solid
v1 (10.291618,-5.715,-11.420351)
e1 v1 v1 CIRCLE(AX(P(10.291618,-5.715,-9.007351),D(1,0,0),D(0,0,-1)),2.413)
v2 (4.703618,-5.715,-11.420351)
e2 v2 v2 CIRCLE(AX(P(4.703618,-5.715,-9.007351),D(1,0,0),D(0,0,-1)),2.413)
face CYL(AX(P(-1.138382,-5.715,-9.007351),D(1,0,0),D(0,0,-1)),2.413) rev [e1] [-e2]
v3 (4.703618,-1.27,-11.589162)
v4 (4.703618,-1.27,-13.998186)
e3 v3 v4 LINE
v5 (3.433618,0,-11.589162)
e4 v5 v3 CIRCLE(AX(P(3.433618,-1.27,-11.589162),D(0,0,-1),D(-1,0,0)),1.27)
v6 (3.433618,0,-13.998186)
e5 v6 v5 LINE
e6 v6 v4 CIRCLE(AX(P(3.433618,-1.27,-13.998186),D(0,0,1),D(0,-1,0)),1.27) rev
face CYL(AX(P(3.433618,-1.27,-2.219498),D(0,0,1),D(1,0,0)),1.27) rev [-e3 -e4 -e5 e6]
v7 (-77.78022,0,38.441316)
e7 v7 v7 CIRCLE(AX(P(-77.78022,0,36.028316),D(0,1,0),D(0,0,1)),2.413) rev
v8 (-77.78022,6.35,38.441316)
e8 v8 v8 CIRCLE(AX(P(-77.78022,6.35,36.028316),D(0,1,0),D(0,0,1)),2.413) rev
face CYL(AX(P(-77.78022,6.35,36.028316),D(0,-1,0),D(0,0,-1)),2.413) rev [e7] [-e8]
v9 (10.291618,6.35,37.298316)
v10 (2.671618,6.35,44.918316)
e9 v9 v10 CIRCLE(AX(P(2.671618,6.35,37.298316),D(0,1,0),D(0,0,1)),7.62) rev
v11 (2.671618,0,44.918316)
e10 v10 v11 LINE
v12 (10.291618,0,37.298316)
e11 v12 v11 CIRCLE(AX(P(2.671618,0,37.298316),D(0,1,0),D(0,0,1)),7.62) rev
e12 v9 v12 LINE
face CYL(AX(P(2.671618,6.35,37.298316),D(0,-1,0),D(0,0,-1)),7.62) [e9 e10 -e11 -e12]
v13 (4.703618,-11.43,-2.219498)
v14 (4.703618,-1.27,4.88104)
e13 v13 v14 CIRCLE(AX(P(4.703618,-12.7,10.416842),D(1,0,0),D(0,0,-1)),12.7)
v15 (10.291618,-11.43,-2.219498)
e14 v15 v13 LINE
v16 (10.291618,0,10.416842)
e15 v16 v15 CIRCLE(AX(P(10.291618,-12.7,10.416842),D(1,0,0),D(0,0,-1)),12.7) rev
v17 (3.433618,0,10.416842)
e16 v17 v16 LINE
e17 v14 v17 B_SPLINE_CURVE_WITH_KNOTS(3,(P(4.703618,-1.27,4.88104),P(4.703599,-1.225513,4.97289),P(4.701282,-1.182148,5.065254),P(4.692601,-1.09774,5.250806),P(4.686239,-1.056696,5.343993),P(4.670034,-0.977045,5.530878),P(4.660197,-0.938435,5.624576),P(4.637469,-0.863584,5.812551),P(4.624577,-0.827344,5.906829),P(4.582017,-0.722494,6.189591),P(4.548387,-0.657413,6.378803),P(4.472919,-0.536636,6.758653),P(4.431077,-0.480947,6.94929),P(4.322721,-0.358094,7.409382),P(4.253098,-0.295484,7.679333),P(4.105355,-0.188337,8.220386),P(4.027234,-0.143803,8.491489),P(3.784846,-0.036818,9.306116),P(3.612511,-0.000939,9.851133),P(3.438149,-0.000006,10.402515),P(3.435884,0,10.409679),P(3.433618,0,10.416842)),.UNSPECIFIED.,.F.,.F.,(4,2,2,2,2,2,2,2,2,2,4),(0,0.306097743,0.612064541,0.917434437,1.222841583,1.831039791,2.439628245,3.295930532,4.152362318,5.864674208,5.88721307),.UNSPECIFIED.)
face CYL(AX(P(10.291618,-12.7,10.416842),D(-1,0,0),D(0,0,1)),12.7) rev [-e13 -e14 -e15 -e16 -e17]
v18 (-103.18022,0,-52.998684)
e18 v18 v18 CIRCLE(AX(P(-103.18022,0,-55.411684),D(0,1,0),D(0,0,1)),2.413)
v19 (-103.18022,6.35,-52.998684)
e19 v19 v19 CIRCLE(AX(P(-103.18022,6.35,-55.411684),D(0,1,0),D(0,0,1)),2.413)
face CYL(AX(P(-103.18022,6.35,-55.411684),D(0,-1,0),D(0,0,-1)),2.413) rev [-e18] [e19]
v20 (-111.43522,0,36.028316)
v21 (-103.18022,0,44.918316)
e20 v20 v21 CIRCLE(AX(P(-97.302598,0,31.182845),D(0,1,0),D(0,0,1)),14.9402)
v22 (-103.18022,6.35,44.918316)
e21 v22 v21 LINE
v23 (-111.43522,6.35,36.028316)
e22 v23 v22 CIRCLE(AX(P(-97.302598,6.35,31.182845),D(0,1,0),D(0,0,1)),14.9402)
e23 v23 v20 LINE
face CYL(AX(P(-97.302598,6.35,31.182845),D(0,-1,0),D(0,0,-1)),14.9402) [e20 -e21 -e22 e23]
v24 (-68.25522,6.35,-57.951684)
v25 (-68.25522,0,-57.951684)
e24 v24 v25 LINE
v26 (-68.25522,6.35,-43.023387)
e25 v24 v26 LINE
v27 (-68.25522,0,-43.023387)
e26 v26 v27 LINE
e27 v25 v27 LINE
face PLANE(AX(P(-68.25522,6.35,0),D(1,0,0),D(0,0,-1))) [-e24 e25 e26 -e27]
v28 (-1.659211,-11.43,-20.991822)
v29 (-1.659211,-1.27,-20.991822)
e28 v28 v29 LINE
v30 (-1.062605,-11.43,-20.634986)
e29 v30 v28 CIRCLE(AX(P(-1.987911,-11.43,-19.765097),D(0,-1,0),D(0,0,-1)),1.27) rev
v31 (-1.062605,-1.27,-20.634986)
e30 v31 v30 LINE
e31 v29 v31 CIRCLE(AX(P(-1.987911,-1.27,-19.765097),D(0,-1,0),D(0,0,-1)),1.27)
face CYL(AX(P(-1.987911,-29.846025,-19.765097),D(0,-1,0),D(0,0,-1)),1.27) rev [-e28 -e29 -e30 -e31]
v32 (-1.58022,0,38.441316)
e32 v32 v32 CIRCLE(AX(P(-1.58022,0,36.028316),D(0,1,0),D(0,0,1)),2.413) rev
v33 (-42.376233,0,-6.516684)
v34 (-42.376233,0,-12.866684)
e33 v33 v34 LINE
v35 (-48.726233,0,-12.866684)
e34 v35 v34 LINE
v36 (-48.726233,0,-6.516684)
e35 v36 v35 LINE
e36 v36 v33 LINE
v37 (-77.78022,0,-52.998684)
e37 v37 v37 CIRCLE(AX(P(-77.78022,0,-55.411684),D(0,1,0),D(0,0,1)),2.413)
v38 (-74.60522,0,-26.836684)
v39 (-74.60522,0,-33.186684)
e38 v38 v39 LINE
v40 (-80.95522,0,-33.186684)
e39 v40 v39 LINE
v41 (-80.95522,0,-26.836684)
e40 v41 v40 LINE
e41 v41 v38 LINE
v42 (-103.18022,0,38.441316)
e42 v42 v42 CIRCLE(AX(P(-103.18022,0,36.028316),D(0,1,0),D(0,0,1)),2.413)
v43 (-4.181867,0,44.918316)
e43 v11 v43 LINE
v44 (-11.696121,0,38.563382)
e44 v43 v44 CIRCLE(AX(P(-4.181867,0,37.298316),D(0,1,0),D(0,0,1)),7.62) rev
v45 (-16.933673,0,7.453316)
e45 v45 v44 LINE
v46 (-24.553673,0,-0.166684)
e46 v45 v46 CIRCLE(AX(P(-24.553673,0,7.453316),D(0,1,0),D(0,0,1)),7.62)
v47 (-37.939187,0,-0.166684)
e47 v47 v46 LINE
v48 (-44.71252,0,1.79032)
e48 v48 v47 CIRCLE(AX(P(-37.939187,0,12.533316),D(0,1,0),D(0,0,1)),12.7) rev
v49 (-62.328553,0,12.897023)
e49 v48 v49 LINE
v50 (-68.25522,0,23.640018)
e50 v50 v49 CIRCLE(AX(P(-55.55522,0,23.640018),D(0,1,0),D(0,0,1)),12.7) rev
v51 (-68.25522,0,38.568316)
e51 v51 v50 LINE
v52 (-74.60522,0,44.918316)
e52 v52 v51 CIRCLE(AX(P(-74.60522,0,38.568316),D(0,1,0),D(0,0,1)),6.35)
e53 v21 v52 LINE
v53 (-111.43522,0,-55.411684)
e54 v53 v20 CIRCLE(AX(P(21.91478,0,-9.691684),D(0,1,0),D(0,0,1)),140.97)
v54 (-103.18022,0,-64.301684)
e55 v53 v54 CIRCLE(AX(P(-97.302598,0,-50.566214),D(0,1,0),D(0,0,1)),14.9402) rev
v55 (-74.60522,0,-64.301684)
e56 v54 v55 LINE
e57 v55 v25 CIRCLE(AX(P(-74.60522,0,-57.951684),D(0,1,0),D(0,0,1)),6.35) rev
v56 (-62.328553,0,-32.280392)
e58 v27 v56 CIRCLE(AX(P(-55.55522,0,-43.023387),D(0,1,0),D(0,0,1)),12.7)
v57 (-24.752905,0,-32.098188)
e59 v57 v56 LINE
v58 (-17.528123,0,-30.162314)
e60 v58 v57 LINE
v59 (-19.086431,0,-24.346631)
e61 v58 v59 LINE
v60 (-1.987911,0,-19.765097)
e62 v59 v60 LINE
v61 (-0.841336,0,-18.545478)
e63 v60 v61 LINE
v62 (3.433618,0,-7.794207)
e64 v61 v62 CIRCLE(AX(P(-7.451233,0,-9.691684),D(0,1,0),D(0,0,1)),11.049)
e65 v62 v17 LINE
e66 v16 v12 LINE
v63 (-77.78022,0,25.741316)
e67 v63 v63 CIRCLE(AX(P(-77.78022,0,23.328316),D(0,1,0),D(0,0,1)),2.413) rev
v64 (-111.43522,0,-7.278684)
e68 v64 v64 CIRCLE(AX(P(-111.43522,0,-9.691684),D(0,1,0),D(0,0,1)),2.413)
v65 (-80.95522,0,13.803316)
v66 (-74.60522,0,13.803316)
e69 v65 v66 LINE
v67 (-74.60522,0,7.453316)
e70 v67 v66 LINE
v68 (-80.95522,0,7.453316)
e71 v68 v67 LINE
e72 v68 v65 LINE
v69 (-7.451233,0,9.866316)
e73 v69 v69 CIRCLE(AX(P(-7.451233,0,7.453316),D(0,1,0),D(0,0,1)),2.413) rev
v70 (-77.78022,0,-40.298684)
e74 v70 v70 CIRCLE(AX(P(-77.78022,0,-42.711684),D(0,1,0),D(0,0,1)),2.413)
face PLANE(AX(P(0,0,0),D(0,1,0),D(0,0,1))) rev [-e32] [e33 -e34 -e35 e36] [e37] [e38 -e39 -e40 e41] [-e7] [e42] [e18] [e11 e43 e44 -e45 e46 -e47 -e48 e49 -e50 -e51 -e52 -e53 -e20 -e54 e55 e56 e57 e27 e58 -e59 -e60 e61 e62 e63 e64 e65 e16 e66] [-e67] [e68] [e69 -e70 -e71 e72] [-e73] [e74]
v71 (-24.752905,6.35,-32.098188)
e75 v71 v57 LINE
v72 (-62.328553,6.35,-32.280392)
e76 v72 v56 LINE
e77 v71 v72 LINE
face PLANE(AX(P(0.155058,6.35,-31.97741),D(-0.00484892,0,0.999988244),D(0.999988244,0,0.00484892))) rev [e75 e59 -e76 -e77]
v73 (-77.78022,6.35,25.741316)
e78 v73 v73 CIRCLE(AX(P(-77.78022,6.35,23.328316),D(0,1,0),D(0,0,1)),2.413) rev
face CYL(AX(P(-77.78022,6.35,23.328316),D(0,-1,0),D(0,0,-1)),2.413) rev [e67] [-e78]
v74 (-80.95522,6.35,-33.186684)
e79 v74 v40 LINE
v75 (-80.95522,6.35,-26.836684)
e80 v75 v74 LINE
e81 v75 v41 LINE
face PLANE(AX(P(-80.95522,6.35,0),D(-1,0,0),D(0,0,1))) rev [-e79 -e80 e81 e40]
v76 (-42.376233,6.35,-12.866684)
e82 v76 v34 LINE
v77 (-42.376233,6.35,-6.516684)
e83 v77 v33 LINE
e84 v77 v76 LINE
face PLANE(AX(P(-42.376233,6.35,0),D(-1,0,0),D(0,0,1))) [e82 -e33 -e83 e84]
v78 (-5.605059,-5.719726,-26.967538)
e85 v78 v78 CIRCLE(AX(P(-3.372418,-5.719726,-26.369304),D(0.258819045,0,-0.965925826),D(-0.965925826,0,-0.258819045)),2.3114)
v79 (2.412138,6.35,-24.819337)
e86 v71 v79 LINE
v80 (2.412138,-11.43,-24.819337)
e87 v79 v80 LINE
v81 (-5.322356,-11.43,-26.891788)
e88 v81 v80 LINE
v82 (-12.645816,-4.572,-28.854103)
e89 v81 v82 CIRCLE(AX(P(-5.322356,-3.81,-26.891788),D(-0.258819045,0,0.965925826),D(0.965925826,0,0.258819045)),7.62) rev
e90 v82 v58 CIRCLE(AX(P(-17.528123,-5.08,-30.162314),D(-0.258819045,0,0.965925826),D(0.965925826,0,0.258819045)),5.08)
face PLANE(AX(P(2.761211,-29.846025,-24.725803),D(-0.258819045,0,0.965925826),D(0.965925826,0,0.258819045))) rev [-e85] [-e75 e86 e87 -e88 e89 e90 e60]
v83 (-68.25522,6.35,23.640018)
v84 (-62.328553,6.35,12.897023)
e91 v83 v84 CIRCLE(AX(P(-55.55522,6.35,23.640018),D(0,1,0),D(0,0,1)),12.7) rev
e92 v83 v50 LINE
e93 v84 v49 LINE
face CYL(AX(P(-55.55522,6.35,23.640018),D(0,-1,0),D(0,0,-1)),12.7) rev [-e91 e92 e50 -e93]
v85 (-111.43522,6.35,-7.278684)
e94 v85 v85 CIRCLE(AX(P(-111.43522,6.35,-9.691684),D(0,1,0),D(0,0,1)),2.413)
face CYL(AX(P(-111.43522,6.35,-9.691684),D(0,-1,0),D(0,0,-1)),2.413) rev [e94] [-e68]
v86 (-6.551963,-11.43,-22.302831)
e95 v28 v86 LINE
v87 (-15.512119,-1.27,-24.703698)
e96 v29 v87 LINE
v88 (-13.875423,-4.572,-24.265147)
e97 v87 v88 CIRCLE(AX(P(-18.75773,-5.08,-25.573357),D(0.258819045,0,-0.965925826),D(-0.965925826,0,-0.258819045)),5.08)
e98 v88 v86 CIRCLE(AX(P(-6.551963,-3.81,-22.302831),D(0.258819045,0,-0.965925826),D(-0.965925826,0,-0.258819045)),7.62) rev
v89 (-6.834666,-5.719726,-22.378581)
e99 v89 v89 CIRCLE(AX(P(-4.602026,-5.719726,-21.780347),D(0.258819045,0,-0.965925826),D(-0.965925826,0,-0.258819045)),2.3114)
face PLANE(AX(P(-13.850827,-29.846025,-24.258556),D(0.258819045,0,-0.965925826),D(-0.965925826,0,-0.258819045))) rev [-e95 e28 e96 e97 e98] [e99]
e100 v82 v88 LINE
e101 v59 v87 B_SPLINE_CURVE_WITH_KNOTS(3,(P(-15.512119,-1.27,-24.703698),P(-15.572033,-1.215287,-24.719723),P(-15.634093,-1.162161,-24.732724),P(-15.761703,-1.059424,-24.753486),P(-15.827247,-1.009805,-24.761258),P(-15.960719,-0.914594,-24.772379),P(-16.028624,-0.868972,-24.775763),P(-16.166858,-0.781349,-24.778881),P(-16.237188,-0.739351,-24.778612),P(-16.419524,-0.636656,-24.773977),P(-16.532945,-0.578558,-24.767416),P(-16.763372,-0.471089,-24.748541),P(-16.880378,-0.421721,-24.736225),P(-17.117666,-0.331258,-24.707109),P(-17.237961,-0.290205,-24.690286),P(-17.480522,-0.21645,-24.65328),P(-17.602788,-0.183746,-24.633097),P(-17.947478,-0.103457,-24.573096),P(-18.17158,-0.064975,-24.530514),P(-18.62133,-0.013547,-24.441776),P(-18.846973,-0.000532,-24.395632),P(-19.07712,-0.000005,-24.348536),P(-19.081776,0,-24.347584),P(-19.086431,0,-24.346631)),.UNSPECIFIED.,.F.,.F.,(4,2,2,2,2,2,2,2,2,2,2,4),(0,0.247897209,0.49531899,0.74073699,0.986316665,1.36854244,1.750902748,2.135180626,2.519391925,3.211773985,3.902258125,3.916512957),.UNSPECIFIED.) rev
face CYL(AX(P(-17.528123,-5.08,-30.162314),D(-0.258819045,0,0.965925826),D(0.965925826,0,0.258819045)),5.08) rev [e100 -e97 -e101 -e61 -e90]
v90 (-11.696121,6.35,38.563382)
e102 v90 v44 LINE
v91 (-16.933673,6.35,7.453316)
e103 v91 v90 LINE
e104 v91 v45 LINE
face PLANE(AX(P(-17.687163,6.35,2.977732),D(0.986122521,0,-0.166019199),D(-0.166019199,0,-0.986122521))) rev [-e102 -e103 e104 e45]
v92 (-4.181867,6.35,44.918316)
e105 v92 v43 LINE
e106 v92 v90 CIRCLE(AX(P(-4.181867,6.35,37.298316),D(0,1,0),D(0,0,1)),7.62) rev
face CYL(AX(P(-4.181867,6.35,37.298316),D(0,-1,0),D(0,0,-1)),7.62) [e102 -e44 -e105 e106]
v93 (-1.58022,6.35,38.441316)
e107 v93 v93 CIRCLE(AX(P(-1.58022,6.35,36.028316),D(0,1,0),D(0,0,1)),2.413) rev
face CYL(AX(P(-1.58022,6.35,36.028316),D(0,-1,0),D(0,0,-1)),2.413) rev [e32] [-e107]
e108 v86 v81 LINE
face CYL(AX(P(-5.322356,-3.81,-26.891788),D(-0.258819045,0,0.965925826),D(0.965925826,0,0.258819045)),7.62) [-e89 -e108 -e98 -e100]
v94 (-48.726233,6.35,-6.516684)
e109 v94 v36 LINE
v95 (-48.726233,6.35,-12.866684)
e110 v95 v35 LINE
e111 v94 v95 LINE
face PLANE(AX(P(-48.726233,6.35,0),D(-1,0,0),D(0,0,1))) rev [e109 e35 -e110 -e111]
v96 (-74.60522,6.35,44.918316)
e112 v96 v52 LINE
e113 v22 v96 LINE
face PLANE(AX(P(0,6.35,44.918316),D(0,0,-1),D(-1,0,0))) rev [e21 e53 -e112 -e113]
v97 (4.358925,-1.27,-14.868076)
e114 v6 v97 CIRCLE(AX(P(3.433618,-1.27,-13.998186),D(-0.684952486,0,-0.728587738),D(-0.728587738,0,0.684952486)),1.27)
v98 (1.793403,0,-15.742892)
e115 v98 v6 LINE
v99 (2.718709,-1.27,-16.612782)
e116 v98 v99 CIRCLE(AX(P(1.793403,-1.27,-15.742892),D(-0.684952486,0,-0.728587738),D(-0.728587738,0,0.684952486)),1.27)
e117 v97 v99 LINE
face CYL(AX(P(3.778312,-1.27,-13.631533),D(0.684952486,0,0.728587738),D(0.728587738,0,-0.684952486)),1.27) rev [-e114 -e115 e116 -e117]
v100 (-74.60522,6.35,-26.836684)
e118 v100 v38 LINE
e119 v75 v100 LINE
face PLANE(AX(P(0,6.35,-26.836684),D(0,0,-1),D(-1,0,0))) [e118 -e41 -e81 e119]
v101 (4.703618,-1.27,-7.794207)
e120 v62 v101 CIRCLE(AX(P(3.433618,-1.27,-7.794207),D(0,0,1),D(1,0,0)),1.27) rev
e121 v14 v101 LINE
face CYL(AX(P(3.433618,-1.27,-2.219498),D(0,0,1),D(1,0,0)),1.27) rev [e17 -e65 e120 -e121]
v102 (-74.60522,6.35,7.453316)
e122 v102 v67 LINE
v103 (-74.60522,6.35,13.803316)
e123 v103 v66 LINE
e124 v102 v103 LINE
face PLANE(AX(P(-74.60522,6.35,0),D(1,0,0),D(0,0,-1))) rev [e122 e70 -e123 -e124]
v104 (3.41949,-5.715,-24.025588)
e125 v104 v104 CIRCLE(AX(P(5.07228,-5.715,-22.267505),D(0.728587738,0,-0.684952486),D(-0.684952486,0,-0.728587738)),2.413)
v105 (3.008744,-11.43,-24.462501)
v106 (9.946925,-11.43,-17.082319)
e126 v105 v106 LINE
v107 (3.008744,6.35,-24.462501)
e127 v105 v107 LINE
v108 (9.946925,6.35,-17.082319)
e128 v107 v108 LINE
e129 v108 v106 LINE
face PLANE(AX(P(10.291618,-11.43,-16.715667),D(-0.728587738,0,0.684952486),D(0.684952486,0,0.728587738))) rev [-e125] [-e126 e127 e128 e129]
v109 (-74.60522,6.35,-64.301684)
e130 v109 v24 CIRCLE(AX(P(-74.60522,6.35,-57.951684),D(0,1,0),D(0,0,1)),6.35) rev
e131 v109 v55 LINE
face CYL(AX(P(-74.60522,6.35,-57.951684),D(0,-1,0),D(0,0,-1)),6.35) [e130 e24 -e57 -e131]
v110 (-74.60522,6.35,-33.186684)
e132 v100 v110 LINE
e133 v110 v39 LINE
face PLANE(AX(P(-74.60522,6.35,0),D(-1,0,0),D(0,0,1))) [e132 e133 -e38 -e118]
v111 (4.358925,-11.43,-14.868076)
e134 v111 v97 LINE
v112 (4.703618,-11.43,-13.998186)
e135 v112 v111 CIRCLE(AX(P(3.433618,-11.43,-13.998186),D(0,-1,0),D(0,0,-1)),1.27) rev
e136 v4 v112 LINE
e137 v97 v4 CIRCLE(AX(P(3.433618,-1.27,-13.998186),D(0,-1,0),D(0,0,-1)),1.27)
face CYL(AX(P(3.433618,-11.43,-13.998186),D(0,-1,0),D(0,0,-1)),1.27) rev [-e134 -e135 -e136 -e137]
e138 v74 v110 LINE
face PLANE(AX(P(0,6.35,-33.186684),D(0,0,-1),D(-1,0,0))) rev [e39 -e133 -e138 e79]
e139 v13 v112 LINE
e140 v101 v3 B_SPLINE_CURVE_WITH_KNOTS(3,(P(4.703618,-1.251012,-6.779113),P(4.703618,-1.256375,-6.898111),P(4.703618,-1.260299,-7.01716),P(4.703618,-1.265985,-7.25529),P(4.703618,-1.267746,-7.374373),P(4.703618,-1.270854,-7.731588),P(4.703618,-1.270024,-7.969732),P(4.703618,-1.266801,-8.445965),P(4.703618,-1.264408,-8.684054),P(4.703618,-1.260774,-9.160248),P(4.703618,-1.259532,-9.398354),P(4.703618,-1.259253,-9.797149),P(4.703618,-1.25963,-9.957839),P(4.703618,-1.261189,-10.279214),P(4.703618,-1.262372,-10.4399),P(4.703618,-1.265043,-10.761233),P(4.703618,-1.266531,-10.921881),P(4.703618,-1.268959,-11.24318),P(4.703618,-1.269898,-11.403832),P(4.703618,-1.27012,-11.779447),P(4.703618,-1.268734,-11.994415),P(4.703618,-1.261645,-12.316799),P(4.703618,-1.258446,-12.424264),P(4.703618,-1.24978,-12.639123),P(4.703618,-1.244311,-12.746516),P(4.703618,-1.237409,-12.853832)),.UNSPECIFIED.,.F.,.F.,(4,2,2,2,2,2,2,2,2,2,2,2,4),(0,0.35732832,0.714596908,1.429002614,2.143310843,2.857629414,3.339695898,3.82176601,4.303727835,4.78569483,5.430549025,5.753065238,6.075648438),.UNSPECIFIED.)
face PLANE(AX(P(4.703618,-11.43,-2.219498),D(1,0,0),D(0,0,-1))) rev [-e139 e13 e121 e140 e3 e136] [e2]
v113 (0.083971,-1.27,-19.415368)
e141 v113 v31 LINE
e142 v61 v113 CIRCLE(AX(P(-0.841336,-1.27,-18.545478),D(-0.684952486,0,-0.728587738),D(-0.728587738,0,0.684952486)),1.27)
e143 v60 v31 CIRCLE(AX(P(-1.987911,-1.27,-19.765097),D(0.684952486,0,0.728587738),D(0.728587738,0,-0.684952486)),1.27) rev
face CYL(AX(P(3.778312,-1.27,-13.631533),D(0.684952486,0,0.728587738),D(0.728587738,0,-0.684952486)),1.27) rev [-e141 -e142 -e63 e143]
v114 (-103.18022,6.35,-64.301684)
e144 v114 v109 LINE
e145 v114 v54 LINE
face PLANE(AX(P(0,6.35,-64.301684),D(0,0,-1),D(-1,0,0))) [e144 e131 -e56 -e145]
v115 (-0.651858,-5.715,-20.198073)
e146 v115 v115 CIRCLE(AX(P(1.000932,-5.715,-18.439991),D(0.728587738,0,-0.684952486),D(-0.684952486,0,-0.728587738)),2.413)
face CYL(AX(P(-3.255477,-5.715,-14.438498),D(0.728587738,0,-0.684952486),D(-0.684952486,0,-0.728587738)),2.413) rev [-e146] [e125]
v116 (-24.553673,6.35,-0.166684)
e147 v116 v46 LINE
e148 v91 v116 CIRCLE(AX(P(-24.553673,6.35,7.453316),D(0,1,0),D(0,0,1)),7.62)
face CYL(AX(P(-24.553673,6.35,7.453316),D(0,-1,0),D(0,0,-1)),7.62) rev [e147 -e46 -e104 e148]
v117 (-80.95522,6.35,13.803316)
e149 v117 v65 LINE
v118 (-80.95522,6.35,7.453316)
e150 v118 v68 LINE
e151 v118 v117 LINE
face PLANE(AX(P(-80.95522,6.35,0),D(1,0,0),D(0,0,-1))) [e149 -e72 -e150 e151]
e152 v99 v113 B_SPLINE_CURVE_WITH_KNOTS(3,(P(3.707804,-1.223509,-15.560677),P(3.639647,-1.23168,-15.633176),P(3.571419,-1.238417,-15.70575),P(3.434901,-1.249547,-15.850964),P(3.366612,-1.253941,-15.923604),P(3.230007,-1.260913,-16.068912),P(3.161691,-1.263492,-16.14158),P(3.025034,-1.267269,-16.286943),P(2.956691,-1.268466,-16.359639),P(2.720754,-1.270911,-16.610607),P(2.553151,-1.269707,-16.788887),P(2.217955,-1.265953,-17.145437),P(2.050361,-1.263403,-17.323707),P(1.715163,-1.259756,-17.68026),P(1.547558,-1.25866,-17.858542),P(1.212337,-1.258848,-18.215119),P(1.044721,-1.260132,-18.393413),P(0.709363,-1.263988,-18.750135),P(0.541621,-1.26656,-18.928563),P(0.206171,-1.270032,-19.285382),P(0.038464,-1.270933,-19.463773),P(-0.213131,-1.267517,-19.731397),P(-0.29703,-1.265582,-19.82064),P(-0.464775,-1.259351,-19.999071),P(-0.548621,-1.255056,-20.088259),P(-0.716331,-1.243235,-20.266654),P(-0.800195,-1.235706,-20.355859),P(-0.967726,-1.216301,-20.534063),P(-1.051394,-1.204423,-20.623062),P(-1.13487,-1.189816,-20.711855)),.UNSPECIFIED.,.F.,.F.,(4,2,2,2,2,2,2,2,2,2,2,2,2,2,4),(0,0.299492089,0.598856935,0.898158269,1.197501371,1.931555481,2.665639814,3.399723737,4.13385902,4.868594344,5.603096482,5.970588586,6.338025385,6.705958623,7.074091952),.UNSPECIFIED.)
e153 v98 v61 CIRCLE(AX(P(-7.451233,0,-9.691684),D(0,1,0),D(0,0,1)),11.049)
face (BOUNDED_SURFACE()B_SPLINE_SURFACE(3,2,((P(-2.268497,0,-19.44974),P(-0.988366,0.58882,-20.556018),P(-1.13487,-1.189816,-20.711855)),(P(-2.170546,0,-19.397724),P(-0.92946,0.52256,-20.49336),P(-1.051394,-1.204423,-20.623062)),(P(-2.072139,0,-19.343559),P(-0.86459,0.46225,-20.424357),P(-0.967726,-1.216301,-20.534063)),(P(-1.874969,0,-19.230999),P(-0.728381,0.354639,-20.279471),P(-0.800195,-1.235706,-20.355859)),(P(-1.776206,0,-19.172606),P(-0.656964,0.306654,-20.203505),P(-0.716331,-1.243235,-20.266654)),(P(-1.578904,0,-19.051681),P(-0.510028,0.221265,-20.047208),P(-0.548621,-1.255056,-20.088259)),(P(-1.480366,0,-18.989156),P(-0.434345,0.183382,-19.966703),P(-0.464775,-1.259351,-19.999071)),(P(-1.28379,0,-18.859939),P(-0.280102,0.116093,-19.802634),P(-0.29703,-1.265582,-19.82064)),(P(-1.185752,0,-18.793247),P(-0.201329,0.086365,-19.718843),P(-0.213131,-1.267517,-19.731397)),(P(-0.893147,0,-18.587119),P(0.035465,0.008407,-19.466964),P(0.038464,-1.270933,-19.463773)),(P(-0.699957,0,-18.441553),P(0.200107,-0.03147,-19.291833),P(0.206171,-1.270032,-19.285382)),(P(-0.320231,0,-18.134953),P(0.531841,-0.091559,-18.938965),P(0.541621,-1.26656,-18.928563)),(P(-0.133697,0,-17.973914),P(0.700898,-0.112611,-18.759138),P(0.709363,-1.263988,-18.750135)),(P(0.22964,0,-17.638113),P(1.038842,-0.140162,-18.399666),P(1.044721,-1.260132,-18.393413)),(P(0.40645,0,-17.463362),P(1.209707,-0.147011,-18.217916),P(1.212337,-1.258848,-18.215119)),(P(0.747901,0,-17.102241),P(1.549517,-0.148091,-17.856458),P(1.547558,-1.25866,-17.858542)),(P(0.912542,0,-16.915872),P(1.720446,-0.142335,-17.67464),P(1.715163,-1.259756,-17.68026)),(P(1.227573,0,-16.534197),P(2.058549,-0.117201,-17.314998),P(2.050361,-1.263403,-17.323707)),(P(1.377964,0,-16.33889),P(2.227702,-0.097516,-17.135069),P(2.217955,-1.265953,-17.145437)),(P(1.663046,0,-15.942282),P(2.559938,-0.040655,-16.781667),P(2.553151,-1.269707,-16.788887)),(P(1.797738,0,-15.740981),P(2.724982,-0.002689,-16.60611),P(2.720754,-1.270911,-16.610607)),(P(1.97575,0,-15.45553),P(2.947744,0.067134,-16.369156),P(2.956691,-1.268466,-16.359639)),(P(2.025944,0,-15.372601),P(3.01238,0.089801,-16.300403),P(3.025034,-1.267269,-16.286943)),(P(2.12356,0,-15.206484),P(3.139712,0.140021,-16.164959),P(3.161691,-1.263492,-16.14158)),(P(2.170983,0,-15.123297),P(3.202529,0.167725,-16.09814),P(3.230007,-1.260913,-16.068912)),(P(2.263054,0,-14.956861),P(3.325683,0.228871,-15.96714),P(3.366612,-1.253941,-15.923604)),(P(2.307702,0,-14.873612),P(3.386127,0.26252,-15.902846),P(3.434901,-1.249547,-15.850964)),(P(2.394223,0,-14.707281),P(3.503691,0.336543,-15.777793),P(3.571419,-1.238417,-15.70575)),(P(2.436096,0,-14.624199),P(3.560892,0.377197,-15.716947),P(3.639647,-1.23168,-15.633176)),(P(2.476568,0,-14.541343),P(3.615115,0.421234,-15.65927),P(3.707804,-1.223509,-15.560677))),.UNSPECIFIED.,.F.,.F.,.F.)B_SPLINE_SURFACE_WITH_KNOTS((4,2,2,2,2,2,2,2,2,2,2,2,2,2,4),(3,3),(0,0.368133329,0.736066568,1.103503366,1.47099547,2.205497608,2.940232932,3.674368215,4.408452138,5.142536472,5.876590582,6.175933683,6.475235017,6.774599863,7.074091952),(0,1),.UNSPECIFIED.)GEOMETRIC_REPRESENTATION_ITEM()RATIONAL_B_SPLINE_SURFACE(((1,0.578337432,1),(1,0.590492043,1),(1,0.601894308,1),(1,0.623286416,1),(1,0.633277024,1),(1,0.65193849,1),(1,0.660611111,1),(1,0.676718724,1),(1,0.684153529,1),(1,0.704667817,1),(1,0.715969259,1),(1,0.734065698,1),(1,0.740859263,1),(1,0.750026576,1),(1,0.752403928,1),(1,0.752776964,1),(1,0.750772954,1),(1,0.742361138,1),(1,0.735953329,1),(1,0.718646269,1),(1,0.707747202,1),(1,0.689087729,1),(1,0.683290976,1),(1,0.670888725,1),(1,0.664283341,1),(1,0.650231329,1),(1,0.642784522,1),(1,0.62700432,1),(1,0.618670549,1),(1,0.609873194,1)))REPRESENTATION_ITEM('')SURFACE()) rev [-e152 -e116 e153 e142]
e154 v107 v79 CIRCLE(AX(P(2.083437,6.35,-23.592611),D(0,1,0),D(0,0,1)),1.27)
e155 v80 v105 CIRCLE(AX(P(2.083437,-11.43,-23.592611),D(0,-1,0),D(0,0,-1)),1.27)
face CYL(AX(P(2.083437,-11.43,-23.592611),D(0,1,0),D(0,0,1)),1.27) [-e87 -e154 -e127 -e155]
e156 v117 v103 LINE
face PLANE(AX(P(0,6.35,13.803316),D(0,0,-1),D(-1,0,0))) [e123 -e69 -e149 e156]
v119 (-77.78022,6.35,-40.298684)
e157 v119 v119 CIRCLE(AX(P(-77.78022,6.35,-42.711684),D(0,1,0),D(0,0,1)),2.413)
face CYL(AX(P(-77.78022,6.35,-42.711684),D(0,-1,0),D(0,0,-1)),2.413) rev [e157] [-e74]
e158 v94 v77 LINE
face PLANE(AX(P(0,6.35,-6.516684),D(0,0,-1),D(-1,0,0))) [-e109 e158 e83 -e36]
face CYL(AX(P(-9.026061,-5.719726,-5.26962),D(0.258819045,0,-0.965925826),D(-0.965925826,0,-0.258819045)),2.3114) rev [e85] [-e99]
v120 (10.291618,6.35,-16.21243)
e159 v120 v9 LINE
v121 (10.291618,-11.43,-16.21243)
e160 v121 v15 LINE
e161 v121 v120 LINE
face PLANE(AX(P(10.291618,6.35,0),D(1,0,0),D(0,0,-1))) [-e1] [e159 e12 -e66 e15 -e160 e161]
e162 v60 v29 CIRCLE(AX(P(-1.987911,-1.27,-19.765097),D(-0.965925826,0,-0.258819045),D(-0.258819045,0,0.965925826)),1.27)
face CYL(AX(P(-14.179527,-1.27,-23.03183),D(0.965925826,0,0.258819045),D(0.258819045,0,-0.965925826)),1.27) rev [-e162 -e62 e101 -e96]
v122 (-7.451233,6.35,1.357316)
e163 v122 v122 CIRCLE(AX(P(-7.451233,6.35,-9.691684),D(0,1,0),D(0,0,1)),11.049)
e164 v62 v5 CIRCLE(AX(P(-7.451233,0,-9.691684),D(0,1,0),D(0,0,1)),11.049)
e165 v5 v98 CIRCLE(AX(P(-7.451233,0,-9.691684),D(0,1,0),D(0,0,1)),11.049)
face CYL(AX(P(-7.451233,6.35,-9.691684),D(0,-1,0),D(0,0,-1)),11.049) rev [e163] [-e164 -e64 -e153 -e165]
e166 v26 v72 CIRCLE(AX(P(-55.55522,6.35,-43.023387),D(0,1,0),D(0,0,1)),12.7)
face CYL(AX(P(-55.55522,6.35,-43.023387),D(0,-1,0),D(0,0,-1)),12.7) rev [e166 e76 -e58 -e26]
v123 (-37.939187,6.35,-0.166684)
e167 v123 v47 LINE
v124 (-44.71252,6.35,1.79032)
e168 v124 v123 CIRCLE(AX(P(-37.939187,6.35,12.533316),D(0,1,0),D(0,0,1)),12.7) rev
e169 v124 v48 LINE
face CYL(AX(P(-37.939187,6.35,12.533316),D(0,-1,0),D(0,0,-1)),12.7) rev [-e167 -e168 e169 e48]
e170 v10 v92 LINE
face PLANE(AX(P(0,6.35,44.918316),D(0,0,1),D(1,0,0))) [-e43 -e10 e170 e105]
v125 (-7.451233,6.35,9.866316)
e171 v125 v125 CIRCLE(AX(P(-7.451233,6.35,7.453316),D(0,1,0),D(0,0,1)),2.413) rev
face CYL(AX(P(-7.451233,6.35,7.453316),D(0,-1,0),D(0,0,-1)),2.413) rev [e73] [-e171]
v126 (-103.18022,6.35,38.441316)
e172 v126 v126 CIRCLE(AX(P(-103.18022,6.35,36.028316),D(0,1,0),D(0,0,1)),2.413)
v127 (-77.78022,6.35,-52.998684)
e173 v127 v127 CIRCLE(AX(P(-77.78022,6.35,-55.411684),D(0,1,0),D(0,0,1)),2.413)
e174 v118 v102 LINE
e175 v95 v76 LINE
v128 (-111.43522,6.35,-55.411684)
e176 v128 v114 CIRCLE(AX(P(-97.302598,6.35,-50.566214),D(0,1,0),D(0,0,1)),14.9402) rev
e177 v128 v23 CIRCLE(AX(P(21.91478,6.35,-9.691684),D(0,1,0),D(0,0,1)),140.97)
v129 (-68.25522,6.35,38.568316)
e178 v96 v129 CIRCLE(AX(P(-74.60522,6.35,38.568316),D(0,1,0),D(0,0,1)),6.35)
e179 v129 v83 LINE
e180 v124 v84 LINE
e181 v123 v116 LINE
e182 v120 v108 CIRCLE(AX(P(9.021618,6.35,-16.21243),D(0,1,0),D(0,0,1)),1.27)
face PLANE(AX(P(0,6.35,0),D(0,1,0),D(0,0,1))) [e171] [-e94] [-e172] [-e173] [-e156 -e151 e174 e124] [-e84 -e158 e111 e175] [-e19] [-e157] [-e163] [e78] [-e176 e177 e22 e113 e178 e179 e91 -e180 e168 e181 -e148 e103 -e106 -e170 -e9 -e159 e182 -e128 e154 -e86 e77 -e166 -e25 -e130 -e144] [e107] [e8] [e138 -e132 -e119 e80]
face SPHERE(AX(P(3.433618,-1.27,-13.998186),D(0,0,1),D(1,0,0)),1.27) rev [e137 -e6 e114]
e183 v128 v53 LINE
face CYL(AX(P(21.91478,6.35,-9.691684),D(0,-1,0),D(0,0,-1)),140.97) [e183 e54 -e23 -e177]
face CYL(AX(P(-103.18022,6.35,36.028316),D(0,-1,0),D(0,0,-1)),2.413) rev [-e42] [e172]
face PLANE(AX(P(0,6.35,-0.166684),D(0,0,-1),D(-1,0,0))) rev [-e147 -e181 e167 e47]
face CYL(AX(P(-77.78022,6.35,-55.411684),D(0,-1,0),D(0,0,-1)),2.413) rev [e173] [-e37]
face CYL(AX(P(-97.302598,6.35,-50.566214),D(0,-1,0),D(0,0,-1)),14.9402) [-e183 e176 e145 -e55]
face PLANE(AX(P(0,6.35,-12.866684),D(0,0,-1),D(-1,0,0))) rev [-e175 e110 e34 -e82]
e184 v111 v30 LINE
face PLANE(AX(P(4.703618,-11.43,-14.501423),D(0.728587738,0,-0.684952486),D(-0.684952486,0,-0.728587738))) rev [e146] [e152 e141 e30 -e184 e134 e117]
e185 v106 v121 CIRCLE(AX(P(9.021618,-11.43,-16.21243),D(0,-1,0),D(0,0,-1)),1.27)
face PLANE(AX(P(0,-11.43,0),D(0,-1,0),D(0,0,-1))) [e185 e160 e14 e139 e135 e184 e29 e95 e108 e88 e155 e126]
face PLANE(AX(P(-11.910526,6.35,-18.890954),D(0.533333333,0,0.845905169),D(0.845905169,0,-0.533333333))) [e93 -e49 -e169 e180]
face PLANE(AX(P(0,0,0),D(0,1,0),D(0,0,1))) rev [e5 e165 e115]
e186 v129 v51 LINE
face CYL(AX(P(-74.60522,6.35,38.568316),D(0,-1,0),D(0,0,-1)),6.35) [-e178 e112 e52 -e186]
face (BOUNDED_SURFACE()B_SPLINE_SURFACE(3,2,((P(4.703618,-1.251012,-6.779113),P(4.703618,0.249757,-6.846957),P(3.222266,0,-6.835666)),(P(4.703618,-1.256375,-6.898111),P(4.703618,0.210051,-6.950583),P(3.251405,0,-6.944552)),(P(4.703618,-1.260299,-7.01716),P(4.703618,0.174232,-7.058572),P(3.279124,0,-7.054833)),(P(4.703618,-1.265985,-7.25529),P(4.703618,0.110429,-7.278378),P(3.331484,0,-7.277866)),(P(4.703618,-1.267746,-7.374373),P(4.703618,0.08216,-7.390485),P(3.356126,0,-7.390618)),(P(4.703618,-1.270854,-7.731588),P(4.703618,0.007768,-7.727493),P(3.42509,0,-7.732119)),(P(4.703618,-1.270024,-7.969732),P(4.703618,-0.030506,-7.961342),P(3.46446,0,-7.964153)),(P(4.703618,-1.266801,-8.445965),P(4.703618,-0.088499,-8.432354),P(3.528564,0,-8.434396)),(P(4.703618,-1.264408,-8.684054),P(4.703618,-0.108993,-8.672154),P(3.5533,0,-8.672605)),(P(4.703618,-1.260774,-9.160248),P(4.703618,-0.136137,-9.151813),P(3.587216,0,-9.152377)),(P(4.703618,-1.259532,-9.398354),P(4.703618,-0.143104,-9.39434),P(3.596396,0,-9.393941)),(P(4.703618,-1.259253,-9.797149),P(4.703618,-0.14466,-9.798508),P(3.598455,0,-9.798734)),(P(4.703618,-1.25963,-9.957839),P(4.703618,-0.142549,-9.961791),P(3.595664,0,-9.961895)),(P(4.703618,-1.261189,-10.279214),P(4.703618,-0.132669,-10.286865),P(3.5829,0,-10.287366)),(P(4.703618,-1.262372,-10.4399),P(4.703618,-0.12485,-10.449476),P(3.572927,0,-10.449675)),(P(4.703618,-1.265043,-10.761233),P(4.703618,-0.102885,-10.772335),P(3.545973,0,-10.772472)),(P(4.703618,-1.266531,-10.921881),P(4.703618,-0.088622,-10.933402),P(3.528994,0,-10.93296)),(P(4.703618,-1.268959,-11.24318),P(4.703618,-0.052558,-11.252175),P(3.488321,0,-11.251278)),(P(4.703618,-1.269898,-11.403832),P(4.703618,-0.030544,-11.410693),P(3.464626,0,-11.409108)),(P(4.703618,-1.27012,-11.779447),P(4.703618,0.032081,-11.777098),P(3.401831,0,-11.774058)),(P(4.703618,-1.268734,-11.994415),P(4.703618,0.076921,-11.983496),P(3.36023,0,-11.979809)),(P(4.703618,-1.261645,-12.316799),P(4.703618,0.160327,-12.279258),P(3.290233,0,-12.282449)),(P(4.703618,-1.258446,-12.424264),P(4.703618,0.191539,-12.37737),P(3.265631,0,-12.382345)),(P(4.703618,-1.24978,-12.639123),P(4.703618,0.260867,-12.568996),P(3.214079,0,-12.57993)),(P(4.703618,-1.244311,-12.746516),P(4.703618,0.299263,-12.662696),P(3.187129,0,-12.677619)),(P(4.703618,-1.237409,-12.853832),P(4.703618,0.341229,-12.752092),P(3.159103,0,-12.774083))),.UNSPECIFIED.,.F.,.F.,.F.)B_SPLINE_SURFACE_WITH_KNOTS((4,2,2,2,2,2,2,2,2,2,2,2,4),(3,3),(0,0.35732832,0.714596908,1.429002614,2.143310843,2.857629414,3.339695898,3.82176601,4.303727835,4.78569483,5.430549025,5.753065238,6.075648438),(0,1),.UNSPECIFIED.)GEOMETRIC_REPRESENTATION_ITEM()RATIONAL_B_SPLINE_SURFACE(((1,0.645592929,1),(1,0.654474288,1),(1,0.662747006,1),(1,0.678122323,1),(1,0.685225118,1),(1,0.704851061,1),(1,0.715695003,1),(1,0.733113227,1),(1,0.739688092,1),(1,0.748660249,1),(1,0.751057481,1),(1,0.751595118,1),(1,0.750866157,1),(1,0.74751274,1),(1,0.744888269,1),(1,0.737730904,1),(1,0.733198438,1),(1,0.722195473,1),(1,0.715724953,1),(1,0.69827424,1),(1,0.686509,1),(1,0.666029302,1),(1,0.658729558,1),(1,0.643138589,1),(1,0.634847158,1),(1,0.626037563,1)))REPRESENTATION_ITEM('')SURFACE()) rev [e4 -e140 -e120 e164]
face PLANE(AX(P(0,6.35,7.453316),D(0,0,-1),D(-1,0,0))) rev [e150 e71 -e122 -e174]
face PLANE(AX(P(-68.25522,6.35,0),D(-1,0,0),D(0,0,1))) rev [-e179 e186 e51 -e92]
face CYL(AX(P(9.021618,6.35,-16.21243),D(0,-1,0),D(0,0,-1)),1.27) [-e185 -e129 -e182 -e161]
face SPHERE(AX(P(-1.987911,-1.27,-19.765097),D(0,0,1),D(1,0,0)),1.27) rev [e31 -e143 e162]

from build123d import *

# Parameters (mm, degrees)
SKETCH1_R           = 2.413
SKETCH1_W           = 6.35
SKETCH1_H           = 6.35
SKETCH1_R_2         = 11.049
BOSS_EXTRUDE1_DEPTH = 6.35
BOSS_EXTRUDE4_DEPTH = 11.43
SKETCH7_R           = 2.413
CUT_EXTRUDE4_DEPTH  = 11.43
SKETCH8_R           = 2.413
CUT_EXTRUDE5_DEPTH  = 11.43
BOSS_EXTRUDE5_DEPTH = 11.43
SKETCH14_R          = 2.3114
CUT_EXTRUDE8_DEPTH  = 21.844
CUT_EXTRUDE9_DEPTH  = 21.844
FILLET3_R           = 1.27
FILLET4_R           = 5.08
FILLET5_R           = 7.62
FILLET6_START       = 3.433618276
FILLET6_DEPTH       = 6.8580001
FILLET6_START_2     = -2.219498454
FILLET6_2_DEPTH     = 12.636340452


with BuildPart() as part:
    # Sketch1 → Boss-Extrude1 (new body)
    with BuildSketch(Plane(origin=(0, 0, 0), x_dir=(1, 0, 0), z_dir=(0, 1, 0))):
        with BuildLine():
            ThreePointArc((-44.712520386, -1.790319958), (-41.464378908, -0.332372105), (-37.939187052, 0.166684391))
            Line((-37.939187052, 0.166684391), (-27.387614836, 0.166684391))
            Line((-27.387614836, 0.166684391), (-24.553673229, 0.166684391))
            ThreePointArc((-24.553673229, 0.166684391), (-19.165519557, -2.065161936), (-16.933673229, -7.453315609))
            Line((-16.933673229, -7.453315609), (-11.696120928, -38.563381903))
            ThreePointArc((-11.696120928, -38.563381903), (-9.102466616, -43.116571583), (-4.181867321, -44.918315609))
            Line((-4.181867321, -44.918315609), (2.671618376, -44.918315609))
            ThreePointArc((2.671618376, -44.918315609), (8.059772048, -42.686469281), (10.291618376, -37.298315609))
            Line((10.291618376, -37.298315609), (10.291618376, -36.576031258))
            Line((10.291618376, -36.576031258), (10.291618376, 31.928258006))
            Line((10.291618376, 31.928258006), (-62.328552859, 32.280391547))
            ThreePointArc((-62.328552859, 32.280391547), (-66.67527648, 36.888704376), (-68.255219526, 43.023387198))
            Line((-68.255219526, 43.023387198), (-68.255219526, 57.951684391))
            ThreePointArc((-68.255219526, 57.951684391), (-70.115091465, 62.441812452), (-74.605219526, 64.301684391))
            Line((-74.605219526, 64.301684391), (-103.180219526, 64.301684391))
            ThreePointArc((-103.180219526, 64.301684391), (-108.250679153, 60.73228976), (-111.435219526, 55.411684391))
            ThreePointArc((-111.435219526, 55.411684391), (-119.055219526, 9.691684391), (-111.435219526, -36.028315609))
            ThreePointArc((-111.435219526, -36.028315609), (-108.250679153, -41.348920977), (-103.180219526, -44.918315609))
            Line((-103.180219526, -44.918315609), (-74.605219526, -44.918315609))
            ThreePointArc((-74.605219526, -44.918315609), (-70.115091465, -43.058443669), (-68.255219526, -38.568315609))
            Line((-68.255219526, -38.568315609), (-68.255219526, -23.640018416))
            ThreePointArc((-68.255219526, -23.640018416), (-66.67527648, -17.505335593), (-62.328552859, -12.897022765))
            Line((-62.328552859, -12.897022765), (-44.712520386, -1.790319958))
        make_face()
        with Locations(Location((-103.180219526, -36.028315609, 0), (0, 0, 270))):
            Circle(SKETCH1_R, mode=Mode.SUBTRACT)
        with Locations(Location((-77.780219526, -36.028315609, 0), (0, 0, 270))):
            Circle(SKETCH1_R, mode=Mode.SUBTRACT)
        with Locations(Location((-77.780219526, -23.328315609, 0), (0, 0, 270))):
            Circle(SKETCH1_R, mode=Mode.SUBTRACT)
        with Locations((-77.780219526, -10.628315609)):
            Rectangle(SKETCH1_W, SKETCH1_H, mode=Mode.SUBTRACT)
        with Locations(Location((-1.580219526, -36.028315609, 0), (0, 0, 270))):
            Circle(SKETCH1_R, mode=Mode.SUBTRACT)
        with Locations(Location((-7.451232573, -7.453315609, 0), (0, 0, 270))):
            Circle(SKETCH1_R, mode=Mode.SUBTRACT)
        with Locations(Location((-111.435219526, 9.691684391, 0), (0, 0, 270))):
            Circle(SKETCH1_R, mode=Mode.SUBTRACT)
        with Locations((-77.780219526, 30.011684391)):
            Rectangle(SKETCH1_W, SKETCH1_H, mode=Mode.SUBTRACT)
        with Locations(Location((-103.180219526, 55.411684391, 0), (0, 0, 270))):
            Circle(SKETCH1_R, mode=Mode.SUBTRACT)
        with Locations(Location((-77.780219526, 42.711684391, 0), (0, 0, 270))):
            Circle(SKETCH1_R, mode=Mode.SUBTRACT)
        with Locations(Location((-77.780219526, 55.411684391, 0), (0, 0, 270))):
            Circle(SKETCH1_R, mode=Mode.SUBTRACT)
        with Locations((-45.551232573, 9.691684391)):
            Rectangle(SKETCH1_W, SKETCH1_H, mode=Mode.SUBTRACT)
        with Locations(Location((-7.451232573, 9.691684391, 0), (0, 0, 270))):
            Circle(SKETCH1_R_2, mode=Mode.SUBTRACT)
    extrude(amount=BOSS_EXTRUDE1_DEPTH)



with BuildPart() as body_2:
    # Sketch6 → Boss-Extrude4 (new body)
    with BuildSketch(Plane.XZ):
        Polygon((10.291618376, -2.219498454), (10.291618376, -16.715666773), (2.76121074, -24.725802919), (-1.31013754, -20.898288428), (4.703618376, -14.501423083), (4.703618376, -2.219498454), align=None)
    extrude(amount=BOSS_EXTRUDE4_DEPTH)

    # Sketch7 → Cut-Extrude4 (cut)
    with BuildSketch(Plane(origin=(13.805123423, 0, -12.978332071), x_dir=(-0.6849524859235093, 0, -0.7285877380434048), z_dir=(0.7285877380434048, 0, -0.6849524859235093))):
        with Locations((12.749560253, -5.715)):
            Circle(SKETCH7_R)
    extrude(amount=-CUT_EXTRUDE4_DEPTH, mode=Mode.SUBTRACT)

    # Sketch8 → Cut-Extrude5 (cut)
    with BuildSketch(Plane(origin=(10.291618376, 0, 0), x_dir=(0, 0, -1), z_dir=(1, 0, 0))):
        with Locations((9.007351169, -5.715)):
            Circle(SKETCH8_R)
    extrude(amount=-CUT_EXTRUDE5_DEPTH, mode=Mode.SUBTRACT)


with BuildPart() as part_1:
    add(part.part)

    add(body_2.part)  # Boss-Extrude5 merges body 2
    # Sketch13 → Boss-Extrude5 (add)
    with BuildSketch(Plane.XZ):
        Polygon((2.76121074, -24.725802919), (-12.621219973, -28.847512806), (-13.850827217, -24.258556099), (-1.31013754, -20.898288428), align=None)
    extrude(amount=BOSS_EXTRUDE5_DEPTH)

    # Sketch14 → Cut-Extrude8 (cut)
    with BuildSketch(Plane(origin=(6.366416777, 0, -23.759790873), x_dir=(-0.9659258262890685, 0, -0.2588190451025197), z_dir=(0.2588190451025197, 0, -0.9659258262890685))):
        with Locations((10.082383935, -5.719726248)):
            Circle(SKETCH14_R)
    extrude(amount=-CUT_EXTRUDE8_DEPTH, mode=Mode.SUBTRACT)

    # Sketch15 → Cut-Extrude9 (cut)
    with BuildSketch(Plane.XZ):
        Polygon((10.291618376, -16.715666773), (2.76121074, -24.725802919), (-24.752905313, -32.098188096), (10.291618376, -31.928258006), align=None)
    extrude(amount=-CUT_EXTRUDE9_DEPTH, mode=Mode.SUBTRACT)

    # Fillet3
    fillet3_edges = [part_1.edges().sort_by_distance(p)[0] for p in [
        (2.76121074, -2.54, -24.725802919),
        (-1.31013754, -5.715, -20.898288428),
        (-7.580482379, 0, -22.578422263),
        (4.703618376, 0, -8.360460768),
        (1.696740418, 0, -17.699855755),
        (4.703618376, -5.715, -14.501423083),
        (10.291618376, -2.54, -16.715666773),
    ]]
    fillet(fillet3_edges, radius=FILLET3_R)

    # Fillet4
    fillet4_edges = [part_1.edges().sort_by_distance(p)[0] for p in [
        (-13.400373689, 0, -25.939671553),
    ]]
    fillet(fillet4_edges, radius=FILLET4_R)

    # Fillet5
    fillet5_edges = [part_1.edges().sort_by_distance(p)[0] for p in [
        (-13.236023595, -11.43, -26.553034453),
    ]]
    fillet(fillet5_edges, radius=FILLET5_R)

    # Fillet6: read off the stored shape, not the designer's step
    # Fillet6 outline → Fillet6 (add)
    with BuildSketch(Plane.YZ.offset(FILLET6_START)):
        with BuildLine():
            Line((0, -2.219498454), (0, 10.416841998))
            ThreePointArc((0, 10.416841998), (-3.281427921, 1.897423003), (-11.43, -2.219498454))
            Line((-11.43, -2.219498454), (0, -2.219498454))
        make_face()
    extrude(amount=FILLET6_DEPTH)

    # Fillet6 2 outline → Fillet6 2 (cut)
    with BuildSketch(Plane.XY.offset(FILLET6_START_2)):
        with BuildLine():
            Line((4.703618377, -13), (4.703573688, -1.259346045))
            ThreePointArc((4.703573688, -1.259346045), (4.327869313, -0.368215513), (3.433618376, 0))
            Line((3.433618376, 0), (3.433618276, -13))
            Line((3.433618276, -13), (4.703618377, -13))
        make_face()
    extrude(amount=FILLET6_2_DEPTH, mode=Mode.SUBTRACT)


solid = part_1.part
